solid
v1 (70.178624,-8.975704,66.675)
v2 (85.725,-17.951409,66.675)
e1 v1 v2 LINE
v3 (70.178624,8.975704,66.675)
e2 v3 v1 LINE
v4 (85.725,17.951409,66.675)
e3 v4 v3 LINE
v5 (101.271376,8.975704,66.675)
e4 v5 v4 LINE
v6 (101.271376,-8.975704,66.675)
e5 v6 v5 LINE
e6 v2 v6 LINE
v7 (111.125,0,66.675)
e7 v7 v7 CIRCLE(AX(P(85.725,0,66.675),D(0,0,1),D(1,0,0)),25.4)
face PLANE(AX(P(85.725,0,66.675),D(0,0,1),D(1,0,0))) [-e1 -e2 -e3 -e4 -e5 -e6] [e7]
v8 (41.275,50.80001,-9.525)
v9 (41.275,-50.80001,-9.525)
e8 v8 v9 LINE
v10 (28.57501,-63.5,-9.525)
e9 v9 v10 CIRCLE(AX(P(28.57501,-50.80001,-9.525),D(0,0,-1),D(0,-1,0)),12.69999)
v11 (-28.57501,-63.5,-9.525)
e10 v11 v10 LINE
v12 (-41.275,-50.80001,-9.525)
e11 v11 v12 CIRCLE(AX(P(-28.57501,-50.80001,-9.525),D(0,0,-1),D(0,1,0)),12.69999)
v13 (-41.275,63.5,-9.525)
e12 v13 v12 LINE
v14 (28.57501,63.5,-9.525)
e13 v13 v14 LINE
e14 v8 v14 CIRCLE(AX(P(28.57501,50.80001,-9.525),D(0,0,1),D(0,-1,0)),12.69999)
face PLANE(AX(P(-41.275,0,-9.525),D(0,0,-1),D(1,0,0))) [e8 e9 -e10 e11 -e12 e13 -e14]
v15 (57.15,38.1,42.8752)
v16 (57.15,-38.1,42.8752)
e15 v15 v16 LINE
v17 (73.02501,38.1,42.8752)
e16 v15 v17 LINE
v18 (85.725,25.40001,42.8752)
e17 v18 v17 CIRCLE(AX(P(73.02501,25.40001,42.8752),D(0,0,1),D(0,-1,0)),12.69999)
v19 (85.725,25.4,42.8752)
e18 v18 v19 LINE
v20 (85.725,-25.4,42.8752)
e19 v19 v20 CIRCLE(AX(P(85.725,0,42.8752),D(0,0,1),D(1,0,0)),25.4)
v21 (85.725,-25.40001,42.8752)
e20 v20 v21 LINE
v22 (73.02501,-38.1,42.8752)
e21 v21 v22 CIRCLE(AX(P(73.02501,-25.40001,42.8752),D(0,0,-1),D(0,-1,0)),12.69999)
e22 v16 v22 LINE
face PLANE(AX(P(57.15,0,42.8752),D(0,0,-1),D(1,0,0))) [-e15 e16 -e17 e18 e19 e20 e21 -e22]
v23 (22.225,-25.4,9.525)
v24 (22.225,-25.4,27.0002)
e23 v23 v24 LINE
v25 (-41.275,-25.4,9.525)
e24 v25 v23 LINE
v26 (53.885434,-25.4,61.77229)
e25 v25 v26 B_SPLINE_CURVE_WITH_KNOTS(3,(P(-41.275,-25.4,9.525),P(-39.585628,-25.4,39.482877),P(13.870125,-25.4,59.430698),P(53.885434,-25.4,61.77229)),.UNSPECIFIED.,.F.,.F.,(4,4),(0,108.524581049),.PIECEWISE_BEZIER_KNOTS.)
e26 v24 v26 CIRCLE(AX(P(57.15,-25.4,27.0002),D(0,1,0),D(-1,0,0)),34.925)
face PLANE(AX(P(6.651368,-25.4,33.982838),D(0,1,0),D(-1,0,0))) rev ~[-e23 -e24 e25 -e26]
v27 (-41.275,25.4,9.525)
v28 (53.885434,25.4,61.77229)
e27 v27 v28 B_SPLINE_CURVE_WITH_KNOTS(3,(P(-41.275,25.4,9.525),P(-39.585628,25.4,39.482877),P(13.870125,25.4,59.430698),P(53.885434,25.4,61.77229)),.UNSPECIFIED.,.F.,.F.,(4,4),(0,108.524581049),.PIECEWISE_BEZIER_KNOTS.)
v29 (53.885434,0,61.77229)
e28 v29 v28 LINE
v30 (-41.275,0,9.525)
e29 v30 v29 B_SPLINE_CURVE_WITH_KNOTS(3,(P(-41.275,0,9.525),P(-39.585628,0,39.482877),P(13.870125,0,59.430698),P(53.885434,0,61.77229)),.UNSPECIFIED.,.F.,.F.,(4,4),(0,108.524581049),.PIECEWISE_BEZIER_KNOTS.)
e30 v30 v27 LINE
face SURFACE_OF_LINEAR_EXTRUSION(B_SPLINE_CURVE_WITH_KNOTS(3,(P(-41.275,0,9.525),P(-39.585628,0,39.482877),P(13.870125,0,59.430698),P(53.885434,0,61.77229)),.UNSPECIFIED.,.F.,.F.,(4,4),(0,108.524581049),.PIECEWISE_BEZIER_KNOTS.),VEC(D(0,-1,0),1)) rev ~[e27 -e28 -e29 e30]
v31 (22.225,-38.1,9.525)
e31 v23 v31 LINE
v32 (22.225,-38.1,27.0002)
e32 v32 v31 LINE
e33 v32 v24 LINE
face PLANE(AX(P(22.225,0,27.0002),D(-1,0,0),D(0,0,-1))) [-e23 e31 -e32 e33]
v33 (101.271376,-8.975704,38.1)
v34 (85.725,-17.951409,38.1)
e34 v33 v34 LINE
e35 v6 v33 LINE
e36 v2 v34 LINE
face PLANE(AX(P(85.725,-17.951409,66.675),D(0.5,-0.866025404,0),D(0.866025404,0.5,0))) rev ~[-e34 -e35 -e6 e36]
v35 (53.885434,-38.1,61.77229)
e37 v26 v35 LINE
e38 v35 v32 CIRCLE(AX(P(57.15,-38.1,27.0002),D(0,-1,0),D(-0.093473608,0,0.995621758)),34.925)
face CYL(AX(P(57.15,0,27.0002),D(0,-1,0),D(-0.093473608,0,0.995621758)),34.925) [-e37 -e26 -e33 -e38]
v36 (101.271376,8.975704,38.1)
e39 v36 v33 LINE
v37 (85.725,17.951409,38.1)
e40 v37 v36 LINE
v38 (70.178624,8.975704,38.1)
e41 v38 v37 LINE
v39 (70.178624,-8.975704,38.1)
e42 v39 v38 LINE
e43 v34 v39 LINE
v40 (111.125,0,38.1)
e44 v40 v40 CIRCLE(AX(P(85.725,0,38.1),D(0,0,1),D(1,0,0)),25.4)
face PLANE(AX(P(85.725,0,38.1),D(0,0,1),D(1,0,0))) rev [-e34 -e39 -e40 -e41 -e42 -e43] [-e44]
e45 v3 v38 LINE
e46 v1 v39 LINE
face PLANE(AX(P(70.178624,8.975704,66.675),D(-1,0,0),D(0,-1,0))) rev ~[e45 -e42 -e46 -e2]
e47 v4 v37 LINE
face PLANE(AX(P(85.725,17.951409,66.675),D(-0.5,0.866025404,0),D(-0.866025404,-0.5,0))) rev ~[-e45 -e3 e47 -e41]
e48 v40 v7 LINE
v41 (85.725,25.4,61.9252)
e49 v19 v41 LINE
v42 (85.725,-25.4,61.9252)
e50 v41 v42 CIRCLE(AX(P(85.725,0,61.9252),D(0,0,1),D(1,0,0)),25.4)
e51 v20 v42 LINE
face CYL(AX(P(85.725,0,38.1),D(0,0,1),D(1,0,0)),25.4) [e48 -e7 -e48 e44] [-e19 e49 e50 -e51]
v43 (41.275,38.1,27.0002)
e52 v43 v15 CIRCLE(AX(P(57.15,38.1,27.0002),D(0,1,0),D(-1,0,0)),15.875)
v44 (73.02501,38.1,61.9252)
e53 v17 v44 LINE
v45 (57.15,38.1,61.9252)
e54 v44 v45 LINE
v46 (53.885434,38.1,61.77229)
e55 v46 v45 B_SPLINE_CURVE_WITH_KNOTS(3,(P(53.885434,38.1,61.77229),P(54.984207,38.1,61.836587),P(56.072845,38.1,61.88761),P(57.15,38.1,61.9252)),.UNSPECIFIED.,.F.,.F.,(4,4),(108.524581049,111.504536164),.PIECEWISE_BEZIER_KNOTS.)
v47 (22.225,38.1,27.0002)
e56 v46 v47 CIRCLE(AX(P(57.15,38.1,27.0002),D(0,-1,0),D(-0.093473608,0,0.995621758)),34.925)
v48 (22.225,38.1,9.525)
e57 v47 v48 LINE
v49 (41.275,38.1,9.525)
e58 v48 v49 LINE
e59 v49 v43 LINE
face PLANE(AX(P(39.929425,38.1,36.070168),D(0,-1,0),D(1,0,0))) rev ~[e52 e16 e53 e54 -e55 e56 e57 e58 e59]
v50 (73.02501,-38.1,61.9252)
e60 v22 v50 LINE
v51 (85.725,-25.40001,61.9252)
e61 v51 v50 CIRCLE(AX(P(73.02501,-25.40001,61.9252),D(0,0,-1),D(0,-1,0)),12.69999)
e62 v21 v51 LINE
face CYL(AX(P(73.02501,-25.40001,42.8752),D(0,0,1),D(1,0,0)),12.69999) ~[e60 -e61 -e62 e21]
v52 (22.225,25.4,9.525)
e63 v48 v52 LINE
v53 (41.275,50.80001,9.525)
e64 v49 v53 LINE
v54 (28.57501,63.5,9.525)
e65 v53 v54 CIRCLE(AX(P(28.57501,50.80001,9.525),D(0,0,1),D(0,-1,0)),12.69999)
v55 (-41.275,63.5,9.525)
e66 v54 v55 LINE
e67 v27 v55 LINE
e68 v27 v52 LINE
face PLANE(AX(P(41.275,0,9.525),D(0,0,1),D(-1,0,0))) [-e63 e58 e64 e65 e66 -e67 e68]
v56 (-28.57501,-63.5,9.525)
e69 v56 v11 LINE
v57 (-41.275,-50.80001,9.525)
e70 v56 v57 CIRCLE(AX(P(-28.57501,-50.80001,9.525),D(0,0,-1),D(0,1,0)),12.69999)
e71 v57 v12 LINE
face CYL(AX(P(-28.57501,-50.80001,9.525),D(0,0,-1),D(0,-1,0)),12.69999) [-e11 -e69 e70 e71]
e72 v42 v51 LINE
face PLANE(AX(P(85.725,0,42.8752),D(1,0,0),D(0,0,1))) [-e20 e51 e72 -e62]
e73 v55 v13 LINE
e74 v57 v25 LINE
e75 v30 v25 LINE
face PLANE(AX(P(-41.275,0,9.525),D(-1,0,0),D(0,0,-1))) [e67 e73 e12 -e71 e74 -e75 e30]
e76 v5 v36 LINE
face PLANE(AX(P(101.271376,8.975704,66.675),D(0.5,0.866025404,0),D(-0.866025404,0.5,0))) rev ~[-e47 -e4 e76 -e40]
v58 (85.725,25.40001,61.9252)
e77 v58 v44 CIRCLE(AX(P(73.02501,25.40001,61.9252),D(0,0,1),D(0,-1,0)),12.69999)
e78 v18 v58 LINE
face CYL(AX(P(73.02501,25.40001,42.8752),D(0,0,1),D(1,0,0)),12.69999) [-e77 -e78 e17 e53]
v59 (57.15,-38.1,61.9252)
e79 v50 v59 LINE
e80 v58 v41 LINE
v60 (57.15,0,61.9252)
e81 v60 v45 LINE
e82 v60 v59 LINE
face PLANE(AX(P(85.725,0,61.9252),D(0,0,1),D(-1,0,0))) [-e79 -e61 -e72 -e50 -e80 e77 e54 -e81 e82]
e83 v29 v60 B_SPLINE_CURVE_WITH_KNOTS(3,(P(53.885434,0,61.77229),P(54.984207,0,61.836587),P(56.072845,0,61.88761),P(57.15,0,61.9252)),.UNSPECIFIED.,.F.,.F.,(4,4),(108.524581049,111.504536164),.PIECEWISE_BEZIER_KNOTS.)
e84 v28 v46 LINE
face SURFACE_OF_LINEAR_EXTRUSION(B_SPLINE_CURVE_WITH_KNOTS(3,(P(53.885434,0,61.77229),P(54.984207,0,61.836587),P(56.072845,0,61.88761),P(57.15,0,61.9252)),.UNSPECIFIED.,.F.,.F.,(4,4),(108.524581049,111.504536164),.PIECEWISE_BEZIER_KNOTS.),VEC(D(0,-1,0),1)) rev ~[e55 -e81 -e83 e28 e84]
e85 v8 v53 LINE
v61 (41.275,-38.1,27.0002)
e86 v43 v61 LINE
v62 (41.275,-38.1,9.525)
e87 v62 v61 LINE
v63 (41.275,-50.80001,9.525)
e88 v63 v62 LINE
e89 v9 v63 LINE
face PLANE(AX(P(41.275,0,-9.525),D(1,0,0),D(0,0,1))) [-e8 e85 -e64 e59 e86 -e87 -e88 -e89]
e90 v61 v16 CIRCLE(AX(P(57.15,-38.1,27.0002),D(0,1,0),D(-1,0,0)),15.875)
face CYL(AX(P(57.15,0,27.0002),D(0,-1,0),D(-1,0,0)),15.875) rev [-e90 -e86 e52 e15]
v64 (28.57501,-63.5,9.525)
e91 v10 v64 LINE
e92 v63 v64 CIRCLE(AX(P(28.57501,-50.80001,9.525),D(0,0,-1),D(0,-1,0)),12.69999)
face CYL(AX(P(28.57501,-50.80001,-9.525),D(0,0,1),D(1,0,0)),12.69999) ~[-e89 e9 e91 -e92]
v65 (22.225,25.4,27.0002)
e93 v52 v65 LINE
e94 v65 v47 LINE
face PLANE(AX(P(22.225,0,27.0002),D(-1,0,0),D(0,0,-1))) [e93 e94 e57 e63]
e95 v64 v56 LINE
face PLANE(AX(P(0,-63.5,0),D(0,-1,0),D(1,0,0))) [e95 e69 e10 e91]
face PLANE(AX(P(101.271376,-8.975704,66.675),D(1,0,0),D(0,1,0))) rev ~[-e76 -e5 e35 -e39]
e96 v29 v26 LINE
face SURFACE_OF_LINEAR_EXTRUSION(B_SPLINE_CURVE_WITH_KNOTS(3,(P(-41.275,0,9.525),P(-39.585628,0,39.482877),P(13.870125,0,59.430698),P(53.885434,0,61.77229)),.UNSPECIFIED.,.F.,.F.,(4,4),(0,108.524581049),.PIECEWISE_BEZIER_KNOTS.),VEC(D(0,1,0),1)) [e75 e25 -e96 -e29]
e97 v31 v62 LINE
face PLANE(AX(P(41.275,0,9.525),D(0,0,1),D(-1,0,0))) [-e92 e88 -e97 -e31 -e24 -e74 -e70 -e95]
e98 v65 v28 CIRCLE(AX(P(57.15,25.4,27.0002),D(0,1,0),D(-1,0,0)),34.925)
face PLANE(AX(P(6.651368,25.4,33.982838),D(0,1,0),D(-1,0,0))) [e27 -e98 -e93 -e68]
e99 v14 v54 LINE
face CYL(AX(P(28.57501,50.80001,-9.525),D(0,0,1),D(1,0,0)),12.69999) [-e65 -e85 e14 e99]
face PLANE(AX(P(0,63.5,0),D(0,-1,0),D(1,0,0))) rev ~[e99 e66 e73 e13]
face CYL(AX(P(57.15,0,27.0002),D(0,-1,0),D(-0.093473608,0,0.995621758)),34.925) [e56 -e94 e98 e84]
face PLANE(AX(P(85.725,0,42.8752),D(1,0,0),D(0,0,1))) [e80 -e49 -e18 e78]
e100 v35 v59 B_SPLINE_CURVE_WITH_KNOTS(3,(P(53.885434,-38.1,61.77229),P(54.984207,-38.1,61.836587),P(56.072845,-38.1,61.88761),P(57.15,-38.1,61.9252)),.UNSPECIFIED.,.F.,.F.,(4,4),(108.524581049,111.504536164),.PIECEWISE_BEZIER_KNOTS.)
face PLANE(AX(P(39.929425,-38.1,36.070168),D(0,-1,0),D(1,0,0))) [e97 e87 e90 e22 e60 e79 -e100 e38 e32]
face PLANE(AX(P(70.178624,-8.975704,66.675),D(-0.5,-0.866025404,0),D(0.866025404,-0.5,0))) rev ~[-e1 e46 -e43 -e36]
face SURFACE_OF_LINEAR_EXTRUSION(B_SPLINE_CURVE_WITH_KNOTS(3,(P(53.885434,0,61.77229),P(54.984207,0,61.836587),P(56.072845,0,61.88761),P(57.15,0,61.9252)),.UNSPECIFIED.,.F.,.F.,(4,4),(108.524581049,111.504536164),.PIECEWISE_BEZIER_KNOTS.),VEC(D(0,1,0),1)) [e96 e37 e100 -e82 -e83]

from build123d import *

# Parameters (mm, degrees)
F1_DEPTH = 63.5
F2_DEPTH = 25.4
F0_W     = 25.4
F0_H     = 19.05
F3_DEPTH = 38.1
F6_DEPTH = 91.186
F7_R     = 12.69999


# Not quite as in the source:
# - a fillet or chamfer is up to 0.001 mm smaller than in the source, because OpenCascade refuses the exact size


with BuildPart() as f1:
    # F0 (on Front) → F1 (new body, symmetric)
    with BuildSketch(Plane.XZ):
        Polygon((22.225, 9.525), (-41.275, 9.525), (-41.275, -9.525), (41.275, -9.525), (41.275, 9.525), align=None)
    extrude(amount=F1_DEPTH, both=True)

    # F0 (on Front) → F2 (join, symmetric)
    with BuildSketch(Plane.XZ):
        with BuildLine():
            add(Edge.make_bspline(
                [(-41.275, 9.525), (-39.5856284224, 39.4828766469), (13.870125209, 59.4306981306), (53.8854342407, 61.7722898912)],
                knots=[0, 0, 0, 0, 108.5245810491, 108.5245810491, 108.5245810491, 108.5245810491], degree=3))
            Line((-41.275, 9.525), (22.225, 9.525))
            Line((22.225, 9.525), (22.225, 27.0002))
            ThreePointArc((22.225, 27.0002), (31.3258777096, 50.5133948686), (53.8854342407, 61.7722898912))
        make_face()
    extrude(amount=F2_DEPTH, both=True)

    # F0 (on Front) → F3 (join, symmetric)
    with BuildSketch(Plane.XZ):
        with BuildLine():
            Line((22.225, 27.0002), (22.225, 9.525))
            Line((22.225, 9.525), (41.275, 9.525))
            Line((41.275, 9.525), (41.275, 27.0002))
            ThreePointArc((41.275, 27.0002), (45.9246798487, 38.2255201513), (57.15, 42.8752))
            Line((57.15, 42.8752), (60.325, 42.8752))
            Line((60.325, 42.8752), (60.325, 61.9252))
            Line((60.325, 61.9252), (57.15, 61.9252))
            add(Edge.make_bspline(
                [(53.8854342407, 61.7722898912), (54.9842067368, 61.8365871986), (56.0728453275, 61.8876096574), (57.15, 61.9252)],
                knots=[108.5245810491, 108.5245810491, 108.5245810491, 108.5245810491, 111.5045361635, 111.5045361635, 111.5045361635, 111.5045361635], degree=3))
            ThreePointArc((53.8854342407, 61.7722898912), (31.3258777096, 50.5133948686), (22.225, 27.0002))
        make_face()
        with Locations((73.025, 52.4002)):
            Rectangle(F0_W, F0_H)
    extrude(amount=F3_DEPTH, both=True)

    # F0 (on Front) → F4 (revolve)
    with BuildSketch(Plane.XZ):
        Polygon((85.725, 66.675), (85.725, 61.9252), (85.725, 42.8752), (85.725, 38.1), (111.125, 38.1), (111.125, 66.675), align=None)
    revolve(axis=Axis((85.725, 0, 52.3875), (0, 0, 1)))

    # F5 (on face) → F6 (cut)
    with BuildSketch(Plane.XY.offset(66.675)):
        Polygon((101.2713760138, -8.9757043765), (101.2713760138, 8.9757043765), (85.725, 17.9514087529), (70.1786239862, 8.9757043765), (70.1786239862, -8.9757043765), (85.725, -17.9514087529), align=None)
    extrude(amount=-F6_DEPTH, mode=Mode.SUBTRACT)

    # F7 (radius 12.7 in the source; OpenCascade refuses exactly that, so slightly less here)
    f7_edges = [f1.edges().sort_by_distance(p)[0] for p in [
        (85.725, -38.1, 52.4002),
        (85.725, 38.1, 52.4002),
        (41.275, -63.5, 0),
        (-41.275, -63.5, 0),
        (41.275, 63.5, 0),
    ]]
    fillet(f7_edges, radius=F7_R)


solid = f1.part
